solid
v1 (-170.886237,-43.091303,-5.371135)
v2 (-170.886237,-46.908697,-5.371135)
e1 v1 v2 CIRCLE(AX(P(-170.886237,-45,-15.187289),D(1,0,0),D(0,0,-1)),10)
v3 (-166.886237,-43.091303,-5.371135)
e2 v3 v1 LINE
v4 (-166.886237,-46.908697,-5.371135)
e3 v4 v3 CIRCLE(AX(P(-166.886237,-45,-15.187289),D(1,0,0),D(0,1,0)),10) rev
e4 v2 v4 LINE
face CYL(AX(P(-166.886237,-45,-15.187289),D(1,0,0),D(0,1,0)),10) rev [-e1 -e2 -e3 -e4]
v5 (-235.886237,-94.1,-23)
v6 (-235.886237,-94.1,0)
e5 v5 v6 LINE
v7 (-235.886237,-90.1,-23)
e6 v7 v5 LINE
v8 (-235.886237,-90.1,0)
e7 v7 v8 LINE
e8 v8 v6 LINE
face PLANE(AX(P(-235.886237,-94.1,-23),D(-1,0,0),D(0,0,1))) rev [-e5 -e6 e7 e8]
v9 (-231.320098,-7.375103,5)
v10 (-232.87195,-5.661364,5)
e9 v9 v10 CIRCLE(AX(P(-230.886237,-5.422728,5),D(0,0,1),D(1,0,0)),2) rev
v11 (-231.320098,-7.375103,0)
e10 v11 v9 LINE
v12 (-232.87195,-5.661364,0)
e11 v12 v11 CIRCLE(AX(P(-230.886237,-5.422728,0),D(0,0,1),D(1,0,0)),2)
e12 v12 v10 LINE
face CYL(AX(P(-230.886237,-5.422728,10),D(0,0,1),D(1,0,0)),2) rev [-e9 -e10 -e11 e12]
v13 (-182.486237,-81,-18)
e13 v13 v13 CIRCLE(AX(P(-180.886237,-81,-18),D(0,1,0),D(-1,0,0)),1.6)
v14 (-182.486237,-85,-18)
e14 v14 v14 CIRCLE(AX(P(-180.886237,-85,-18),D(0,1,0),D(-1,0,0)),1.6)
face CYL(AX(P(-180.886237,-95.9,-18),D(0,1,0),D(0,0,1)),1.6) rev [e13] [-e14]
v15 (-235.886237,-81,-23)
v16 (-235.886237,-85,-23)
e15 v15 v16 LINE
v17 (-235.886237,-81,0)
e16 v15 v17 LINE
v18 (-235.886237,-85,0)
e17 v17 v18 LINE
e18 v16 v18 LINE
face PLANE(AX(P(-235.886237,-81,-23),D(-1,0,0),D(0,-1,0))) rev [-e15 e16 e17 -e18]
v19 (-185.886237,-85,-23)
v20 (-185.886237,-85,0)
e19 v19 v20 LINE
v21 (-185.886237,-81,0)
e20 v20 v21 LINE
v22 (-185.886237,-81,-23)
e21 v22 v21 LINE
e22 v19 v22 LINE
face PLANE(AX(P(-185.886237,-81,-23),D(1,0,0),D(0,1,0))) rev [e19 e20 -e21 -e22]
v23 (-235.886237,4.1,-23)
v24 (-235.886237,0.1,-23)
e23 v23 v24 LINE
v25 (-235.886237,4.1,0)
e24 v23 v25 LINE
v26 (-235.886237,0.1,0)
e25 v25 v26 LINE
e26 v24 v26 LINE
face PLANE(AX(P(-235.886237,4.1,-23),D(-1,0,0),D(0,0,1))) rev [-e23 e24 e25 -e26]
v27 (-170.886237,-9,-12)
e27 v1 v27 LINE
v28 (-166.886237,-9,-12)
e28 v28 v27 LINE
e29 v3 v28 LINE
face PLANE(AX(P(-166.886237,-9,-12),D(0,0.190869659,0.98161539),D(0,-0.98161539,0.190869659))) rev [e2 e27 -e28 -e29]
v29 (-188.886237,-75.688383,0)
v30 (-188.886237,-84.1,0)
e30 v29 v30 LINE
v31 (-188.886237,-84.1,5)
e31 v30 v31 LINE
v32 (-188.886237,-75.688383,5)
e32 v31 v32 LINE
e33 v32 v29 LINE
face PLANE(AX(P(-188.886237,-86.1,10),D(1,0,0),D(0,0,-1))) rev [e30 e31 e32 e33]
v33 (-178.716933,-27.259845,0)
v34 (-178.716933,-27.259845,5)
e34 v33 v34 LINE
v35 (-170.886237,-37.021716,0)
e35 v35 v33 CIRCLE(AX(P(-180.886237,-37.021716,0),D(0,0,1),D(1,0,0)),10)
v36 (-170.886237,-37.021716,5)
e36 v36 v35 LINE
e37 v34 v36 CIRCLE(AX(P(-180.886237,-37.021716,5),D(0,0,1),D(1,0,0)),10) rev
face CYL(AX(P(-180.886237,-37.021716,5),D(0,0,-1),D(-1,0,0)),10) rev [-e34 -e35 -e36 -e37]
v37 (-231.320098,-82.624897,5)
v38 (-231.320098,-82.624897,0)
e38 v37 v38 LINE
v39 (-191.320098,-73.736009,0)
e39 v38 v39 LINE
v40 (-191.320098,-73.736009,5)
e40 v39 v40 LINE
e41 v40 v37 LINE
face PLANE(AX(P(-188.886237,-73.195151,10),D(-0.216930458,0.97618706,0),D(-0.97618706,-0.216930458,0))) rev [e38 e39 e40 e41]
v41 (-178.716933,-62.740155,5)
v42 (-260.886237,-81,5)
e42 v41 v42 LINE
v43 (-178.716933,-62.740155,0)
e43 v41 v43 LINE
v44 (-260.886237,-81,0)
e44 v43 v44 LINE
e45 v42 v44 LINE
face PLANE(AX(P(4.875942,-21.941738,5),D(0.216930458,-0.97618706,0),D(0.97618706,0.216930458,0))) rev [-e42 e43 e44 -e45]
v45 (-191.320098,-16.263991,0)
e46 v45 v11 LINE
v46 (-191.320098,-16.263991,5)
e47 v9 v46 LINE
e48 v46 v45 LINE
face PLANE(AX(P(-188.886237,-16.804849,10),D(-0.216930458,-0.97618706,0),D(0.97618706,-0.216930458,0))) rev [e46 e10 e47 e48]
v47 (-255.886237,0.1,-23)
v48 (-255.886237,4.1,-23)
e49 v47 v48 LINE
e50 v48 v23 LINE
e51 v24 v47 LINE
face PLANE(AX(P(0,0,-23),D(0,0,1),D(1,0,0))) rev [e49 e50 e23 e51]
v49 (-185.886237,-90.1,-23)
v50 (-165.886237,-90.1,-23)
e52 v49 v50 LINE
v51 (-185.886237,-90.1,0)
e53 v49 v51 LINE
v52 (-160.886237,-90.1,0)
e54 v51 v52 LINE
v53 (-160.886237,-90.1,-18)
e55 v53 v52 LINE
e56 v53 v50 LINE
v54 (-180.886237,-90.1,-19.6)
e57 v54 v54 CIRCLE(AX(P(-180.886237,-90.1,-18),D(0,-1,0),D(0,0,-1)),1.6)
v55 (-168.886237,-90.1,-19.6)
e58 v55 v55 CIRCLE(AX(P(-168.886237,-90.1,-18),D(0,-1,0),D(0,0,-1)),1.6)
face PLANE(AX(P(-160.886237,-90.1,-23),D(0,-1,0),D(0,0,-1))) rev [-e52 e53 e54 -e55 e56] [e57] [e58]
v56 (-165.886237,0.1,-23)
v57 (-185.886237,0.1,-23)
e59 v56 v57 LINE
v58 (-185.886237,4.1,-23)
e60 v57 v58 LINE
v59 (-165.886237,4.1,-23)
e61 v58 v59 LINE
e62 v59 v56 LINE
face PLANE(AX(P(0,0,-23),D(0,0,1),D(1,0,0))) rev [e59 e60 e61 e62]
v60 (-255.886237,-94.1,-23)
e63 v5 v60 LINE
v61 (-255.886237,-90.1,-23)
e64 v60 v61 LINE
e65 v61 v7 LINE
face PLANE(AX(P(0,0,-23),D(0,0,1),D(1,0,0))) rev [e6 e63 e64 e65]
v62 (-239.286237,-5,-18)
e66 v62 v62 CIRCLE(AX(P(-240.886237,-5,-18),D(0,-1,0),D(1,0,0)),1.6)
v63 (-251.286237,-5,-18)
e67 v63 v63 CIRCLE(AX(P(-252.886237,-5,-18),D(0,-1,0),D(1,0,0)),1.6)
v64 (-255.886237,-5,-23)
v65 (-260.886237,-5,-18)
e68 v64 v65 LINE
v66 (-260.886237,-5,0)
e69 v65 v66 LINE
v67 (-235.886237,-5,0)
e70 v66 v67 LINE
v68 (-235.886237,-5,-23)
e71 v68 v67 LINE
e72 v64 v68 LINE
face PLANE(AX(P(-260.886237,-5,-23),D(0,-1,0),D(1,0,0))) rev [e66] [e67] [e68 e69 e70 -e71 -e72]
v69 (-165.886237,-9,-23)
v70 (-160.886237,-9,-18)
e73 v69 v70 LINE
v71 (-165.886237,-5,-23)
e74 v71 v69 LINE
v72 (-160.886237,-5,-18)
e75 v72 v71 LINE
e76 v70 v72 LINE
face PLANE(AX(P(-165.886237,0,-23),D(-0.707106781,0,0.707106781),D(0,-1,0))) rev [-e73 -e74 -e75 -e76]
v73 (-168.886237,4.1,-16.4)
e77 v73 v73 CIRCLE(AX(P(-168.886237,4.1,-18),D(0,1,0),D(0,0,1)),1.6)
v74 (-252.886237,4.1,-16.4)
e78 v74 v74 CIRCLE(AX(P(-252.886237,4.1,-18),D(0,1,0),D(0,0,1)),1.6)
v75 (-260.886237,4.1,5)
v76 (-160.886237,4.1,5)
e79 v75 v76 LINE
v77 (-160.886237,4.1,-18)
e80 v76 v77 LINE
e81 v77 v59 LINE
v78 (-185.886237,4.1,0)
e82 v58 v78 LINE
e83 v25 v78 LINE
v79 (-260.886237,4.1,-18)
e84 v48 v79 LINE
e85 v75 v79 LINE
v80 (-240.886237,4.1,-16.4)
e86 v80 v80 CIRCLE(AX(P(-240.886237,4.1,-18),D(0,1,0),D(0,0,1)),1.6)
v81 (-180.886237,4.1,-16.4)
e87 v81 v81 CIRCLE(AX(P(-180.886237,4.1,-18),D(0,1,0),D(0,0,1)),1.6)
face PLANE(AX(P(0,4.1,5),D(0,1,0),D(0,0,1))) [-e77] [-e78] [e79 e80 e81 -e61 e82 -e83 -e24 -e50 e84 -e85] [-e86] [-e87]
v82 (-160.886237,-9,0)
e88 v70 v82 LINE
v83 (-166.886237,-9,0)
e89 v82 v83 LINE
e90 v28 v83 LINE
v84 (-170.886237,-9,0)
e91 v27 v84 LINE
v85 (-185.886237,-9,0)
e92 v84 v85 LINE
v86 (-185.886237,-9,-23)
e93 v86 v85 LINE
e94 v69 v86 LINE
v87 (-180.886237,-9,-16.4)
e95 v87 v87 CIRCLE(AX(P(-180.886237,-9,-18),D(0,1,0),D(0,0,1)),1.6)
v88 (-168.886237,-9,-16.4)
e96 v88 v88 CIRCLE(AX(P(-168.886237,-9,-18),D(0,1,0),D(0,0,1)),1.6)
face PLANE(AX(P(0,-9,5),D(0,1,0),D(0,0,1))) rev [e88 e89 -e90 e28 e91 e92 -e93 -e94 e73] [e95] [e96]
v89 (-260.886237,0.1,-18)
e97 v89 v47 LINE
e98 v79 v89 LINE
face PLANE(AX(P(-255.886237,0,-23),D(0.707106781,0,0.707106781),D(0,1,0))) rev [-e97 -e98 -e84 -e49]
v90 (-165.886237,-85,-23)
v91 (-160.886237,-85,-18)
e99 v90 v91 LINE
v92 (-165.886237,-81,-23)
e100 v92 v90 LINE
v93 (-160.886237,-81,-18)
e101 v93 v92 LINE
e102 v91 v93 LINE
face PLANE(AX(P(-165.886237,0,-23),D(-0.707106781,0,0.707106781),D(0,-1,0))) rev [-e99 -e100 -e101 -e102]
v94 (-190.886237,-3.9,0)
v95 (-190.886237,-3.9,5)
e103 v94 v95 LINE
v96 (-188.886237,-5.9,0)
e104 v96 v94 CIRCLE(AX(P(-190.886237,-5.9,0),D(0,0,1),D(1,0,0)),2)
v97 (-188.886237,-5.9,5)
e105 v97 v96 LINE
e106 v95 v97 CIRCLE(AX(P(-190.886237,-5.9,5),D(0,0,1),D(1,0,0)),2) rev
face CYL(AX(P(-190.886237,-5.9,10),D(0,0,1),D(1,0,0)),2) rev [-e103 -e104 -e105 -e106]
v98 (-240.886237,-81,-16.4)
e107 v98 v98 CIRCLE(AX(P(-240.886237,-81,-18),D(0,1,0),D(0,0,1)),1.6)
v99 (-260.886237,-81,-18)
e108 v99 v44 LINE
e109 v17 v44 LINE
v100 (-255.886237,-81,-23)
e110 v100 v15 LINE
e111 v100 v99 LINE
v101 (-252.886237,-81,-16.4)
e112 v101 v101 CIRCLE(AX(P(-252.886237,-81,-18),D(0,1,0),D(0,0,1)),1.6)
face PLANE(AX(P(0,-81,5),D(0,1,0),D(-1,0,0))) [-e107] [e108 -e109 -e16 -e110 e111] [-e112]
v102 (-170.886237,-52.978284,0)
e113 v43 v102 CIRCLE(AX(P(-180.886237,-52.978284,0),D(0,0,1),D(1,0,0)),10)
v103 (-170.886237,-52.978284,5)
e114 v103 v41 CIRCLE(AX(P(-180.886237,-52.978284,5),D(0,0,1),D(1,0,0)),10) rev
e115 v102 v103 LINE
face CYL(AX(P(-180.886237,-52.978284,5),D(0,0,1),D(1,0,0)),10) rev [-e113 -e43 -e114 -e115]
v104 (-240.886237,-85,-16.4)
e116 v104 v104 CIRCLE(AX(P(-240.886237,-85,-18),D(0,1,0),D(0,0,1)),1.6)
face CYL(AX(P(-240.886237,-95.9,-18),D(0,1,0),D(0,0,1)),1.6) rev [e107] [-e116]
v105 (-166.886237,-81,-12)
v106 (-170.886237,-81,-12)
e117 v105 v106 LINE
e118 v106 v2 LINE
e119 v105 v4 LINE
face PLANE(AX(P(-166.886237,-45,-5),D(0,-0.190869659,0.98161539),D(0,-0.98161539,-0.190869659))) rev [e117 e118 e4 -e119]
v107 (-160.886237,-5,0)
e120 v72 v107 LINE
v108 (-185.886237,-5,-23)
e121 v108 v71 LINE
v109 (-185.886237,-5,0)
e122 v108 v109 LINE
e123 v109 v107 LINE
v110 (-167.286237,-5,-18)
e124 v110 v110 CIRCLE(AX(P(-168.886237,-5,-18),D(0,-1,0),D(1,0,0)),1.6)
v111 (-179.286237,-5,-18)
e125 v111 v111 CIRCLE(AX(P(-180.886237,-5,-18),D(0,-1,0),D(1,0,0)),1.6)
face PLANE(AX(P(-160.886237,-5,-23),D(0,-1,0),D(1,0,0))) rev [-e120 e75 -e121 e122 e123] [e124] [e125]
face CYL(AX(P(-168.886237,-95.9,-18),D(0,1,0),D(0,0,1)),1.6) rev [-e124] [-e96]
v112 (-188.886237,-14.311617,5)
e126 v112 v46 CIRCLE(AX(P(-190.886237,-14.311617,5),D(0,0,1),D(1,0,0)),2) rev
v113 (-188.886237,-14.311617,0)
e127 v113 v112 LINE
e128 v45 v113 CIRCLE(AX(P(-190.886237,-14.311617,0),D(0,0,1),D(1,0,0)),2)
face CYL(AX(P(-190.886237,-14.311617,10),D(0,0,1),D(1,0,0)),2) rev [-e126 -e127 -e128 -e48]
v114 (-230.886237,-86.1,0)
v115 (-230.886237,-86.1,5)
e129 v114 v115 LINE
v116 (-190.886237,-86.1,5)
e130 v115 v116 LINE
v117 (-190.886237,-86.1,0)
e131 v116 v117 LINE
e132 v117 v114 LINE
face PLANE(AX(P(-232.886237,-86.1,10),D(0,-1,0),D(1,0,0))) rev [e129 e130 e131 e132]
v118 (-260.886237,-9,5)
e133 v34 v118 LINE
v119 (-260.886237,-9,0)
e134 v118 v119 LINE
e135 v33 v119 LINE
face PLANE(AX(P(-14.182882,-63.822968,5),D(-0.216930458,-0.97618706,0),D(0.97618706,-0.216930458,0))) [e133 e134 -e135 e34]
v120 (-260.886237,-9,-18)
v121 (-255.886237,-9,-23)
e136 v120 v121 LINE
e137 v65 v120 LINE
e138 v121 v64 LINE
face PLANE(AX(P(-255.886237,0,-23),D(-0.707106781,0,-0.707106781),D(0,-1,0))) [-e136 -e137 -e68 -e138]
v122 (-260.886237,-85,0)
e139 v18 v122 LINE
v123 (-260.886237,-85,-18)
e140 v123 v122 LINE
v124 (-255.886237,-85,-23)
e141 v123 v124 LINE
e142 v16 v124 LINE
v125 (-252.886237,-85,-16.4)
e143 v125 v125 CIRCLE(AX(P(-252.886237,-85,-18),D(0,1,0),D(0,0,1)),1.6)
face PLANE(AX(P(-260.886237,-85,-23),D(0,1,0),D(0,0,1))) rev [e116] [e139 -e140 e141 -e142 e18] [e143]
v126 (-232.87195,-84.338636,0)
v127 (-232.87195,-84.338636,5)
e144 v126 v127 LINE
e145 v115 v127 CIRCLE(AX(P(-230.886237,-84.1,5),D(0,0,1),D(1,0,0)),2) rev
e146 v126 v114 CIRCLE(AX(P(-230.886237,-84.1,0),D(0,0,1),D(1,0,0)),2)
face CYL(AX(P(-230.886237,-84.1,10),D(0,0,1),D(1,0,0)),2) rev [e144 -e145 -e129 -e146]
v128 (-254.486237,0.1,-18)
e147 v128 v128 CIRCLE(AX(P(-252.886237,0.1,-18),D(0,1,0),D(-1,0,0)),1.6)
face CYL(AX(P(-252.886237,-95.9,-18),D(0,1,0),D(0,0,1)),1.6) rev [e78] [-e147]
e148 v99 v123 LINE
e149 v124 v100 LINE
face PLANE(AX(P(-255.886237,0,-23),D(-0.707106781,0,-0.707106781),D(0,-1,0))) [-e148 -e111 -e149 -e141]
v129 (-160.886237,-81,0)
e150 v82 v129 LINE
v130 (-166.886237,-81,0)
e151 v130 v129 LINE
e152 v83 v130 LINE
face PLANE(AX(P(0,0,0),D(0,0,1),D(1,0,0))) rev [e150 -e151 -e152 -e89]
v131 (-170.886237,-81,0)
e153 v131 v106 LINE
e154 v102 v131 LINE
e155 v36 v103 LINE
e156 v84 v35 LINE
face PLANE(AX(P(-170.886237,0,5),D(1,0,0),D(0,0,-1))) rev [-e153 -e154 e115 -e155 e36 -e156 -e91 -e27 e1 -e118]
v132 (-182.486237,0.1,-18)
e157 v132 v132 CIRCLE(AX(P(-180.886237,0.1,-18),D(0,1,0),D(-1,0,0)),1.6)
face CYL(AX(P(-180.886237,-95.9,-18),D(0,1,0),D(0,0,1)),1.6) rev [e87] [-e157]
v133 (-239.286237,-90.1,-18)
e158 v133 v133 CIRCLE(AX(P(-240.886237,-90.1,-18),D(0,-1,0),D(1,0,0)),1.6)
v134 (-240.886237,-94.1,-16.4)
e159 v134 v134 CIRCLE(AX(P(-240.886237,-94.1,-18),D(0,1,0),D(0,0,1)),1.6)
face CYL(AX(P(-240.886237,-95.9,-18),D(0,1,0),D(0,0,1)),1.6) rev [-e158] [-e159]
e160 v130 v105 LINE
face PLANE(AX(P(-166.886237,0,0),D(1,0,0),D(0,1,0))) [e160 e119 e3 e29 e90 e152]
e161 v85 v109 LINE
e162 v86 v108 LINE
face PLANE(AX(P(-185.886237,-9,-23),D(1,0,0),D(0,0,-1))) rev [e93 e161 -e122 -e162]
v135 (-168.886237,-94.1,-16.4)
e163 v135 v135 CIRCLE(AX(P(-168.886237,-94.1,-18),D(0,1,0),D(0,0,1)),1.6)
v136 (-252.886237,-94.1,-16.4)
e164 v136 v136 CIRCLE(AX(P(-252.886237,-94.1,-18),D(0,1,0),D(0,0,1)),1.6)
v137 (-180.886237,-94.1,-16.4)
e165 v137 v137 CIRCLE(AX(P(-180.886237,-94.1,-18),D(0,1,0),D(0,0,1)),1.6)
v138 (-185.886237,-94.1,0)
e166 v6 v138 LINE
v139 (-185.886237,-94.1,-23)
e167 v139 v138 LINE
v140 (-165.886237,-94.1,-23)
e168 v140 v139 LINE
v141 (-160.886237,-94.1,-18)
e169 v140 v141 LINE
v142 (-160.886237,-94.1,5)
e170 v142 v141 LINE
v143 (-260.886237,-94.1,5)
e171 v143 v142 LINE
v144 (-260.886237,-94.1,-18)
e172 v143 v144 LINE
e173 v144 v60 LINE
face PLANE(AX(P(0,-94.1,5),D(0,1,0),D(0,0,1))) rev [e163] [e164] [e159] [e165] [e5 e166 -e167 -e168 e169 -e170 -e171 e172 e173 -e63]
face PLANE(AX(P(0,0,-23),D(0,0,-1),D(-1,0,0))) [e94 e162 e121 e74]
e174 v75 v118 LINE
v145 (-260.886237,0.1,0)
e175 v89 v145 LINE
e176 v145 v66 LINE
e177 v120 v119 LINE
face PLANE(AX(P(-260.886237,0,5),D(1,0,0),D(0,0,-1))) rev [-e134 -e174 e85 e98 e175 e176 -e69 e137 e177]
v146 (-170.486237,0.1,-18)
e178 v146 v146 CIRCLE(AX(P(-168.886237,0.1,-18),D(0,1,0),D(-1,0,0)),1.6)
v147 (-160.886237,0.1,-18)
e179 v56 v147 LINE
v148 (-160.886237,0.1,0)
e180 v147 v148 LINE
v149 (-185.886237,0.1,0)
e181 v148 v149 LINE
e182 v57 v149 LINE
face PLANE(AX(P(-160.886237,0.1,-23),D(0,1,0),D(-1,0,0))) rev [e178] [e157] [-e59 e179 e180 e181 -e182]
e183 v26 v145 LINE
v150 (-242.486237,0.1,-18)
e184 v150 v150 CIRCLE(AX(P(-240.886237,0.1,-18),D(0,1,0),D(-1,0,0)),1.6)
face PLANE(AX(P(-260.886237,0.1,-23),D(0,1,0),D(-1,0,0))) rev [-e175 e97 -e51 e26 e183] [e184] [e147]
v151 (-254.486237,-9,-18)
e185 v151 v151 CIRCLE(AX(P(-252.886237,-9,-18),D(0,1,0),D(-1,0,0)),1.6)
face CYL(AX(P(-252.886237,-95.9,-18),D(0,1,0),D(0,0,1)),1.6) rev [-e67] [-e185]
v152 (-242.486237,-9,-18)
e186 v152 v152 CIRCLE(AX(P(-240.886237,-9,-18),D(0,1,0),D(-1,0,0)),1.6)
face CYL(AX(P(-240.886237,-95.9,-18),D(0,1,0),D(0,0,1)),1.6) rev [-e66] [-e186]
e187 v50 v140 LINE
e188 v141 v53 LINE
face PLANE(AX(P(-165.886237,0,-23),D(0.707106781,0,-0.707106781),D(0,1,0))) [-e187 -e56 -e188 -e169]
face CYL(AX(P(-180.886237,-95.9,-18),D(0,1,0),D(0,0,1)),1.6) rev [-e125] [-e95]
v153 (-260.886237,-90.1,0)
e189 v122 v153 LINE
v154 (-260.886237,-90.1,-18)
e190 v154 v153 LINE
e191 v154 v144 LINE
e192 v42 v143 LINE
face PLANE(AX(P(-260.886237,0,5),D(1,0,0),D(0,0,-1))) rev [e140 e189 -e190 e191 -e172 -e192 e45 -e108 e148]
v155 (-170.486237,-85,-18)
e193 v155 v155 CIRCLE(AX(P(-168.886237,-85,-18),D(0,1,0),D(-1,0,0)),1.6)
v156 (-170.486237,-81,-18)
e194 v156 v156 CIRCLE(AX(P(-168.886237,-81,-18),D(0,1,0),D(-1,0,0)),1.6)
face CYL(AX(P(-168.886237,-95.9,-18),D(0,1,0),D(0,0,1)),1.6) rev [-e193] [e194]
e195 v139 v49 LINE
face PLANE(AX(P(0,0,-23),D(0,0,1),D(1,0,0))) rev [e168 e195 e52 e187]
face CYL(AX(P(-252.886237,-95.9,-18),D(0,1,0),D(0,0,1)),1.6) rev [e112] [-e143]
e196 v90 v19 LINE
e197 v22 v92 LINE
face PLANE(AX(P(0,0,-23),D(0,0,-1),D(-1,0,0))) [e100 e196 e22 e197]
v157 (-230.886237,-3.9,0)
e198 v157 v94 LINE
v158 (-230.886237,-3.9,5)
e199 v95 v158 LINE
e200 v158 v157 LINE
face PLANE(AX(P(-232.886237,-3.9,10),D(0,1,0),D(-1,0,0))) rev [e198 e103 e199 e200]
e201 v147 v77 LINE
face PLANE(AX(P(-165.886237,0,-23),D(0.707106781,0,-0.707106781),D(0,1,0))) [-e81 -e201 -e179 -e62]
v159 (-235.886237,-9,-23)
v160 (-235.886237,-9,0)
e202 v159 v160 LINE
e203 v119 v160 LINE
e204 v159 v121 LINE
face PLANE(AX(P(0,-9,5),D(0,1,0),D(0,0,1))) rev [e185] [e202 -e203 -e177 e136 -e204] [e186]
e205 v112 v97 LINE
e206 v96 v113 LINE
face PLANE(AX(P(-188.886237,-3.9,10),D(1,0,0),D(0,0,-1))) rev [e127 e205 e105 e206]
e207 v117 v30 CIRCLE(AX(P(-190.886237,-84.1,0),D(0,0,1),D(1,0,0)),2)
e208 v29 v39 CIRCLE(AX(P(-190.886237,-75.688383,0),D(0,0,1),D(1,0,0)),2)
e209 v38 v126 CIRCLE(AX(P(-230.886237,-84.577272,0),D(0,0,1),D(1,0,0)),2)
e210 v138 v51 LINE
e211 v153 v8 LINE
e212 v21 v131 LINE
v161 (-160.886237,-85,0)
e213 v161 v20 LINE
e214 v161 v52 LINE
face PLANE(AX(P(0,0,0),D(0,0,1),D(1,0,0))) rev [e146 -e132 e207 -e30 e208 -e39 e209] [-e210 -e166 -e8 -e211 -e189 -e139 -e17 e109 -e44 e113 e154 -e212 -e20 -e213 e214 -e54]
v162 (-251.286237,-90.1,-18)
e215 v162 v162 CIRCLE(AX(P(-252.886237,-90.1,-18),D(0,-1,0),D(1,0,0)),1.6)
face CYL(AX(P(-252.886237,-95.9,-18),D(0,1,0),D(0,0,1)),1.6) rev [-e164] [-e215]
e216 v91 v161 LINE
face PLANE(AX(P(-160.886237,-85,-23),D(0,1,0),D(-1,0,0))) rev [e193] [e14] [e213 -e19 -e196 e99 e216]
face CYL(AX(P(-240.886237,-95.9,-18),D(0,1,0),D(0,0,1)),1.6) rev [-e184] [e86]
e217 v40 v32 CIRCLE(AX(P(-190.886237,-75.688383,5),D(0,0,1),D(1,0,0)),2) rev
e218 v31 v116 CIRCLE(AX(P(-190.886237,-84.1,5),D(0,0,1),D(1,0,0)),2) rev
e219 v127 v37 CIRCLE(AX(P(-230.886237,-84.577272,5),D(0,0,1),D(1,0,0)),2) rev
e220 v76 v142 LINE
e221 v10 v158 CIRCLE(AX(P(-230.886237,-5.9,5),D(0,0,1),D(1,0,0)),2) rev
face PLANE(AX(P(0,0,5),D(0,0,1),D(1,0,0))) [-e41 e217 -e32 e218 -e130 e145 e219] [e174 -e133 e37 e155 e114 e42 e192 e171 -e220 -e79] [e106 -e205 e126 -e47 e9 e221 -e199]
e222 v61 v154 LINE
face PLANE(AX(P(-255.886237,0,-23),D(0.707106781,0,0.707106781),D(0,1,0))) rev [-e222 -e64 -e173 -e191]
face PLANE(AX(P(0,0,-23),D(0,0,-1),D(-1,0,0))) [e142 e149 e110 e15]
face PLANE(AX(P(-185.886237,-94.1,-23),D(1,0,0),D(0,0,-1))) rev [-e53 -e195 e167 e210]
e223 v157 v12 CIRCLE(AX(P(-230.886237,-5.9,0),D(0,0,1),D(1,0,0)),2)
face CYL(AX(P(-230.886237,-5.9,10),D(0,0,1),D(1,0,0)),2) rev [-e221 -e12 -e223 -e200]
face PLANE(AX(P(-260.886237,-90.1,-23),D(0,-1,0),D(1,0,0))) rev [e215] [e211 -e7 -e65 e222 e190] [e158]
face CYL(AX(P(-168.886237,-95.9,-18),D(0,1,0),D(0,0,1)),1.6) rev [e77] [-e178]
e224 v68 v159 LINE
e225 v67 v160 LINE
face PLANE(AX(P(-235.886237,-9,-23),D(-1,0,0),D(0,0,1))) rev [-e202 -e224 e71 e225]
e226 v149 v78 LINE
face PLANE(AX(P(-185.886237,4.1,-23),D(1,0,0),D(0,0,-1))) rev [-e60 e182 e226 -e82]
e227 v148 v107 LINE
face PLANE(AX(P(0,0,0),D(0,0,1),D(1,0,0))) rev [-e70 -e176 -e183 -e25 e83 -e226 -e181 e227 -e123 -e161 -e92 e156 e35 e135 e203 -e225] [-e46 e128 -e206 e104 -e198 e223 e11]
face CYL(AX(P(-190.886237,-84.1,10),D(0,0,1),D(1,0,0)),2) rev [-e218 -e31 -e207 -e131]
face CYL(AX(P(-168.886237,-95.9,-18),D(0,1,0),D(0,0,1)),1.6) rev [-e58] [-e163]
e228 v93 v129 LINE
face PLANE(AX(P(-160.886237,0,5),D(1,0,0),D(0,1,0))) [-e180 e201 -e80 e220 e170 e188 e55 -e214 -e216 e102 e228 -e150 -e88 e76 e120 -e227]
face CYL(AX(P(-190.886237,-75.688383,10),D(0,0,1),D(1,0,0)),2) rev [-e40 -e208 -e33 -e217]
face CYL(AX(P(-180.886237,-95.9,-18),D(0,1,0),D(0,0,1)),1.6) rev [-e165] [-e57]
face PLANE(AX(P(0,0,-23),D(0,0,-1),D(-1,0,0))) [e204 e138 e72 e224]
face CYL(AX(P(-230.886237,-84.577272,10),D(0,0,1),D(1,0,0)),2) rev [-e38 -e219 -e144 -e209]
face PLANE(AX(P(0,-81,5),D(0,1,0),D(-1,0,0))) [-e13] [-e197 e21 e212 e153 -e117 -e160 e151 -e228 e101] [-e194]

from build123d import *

# Parameters (mm, degrees)
SKETCH_1_W          = 100
SKETCH_1_H          = 98.2
EXTRUDE_1_DEPTH     = 5
SKETCH_2_W          = 25
SKETCH_2_H          = 4
EXTRUDE_2_DEPTH     = 23
CHAMFER_1_SIZE      = 5
SKETCH_3_R          = 1.6
CUT_EXTRUDE_1_DEPTH = 100
SKETCH_5_W          = 90
SKETCH_5_H          = 72
CUT_EXTRUDE_2_DEPTH = 10
EXTRUDE_3_DEPTH     = 5
FILLET_1_R          = 10
EXTRUDE_4_DEPTH     = 4
CUT_EXTRUDE_3_DEPTH = 10
FILLET1_R           = 10
FILLET2_R           = 2


with BuildPart() as part:
    # 草图1 → 凸台-拉伸1 (new body)
    with BuildSketch(Plane.XY):
        with Locations((-210.886237356, -45)):
            Rectangle(SKETCH_1_W, SKETCH_1_H)
        with BuildLine():
            ThreePointArc((-245.131057565, -22.358440495), (-248.492232664, -20.607289414), (-250.886237356, -23.545446947))
            Line((-250.886237356, -23.545446947), (-250.886237356, -78))
            ThreePointArc((-250.886237356, -78), (-250.0075577, -80.121320344), (-247.886237356, -81))
            Line((-247.886237356, -81), (-224.42573361, -81))
            ThreePointArc((-224.42573361, -81), (-221.919639103, -79.649087724), (-221.670553819, -76.812993548))
            Line((-221.670553819, -76.812993548), (-245.131057565, -22.358440495))
        make_face(mode=Mode.SUBTRACT)
        with BuildLine():
            ThreePointArc((-191.655684006, -33.128922342), (-194.657829236, -31.333405344), (-197.320051564, -33.602618764))
            Line((-197.320051564, -33.602618764), (-208.123721184, -77.279649032))
            ThreePointArc((-208.123721184, -77.279649032), (-207.573803103, -79.849181859), (-205.211489311, -81))
            Line((-205.211489311, -81), (-175.458011282, -81))
            ThreePointArc((-175.458011282, -81), (-172.949810516, -79.645882413), (-172.705875596, -76.805952611))
            Line((-172.705875596, -76.805952611), (-191.655684006, -33.128922342))
        make_face(mode=Mode.SUBTRACT)
        with BuildLine():
            ThreePointArc((-176.638373042, -42.617387799), (-173.276486201, -44.360720795), (-170.886237356, -41.42334041))
            Line((-170.886237356, -41.42334041), (-170.886237356, -12))
            ThreePointArc((-170.886237356, -12), (-171.764917013, -9.878679656), (-173.886237356, -9))
            Line((-173.886237356, -9), (-186.651909841, -9))
            ThreePointArc((-186.651909841, -9), (-189.160110607, -10.354117587), (-189.404045527, -13.194047389))
            Line((-189.404045527, -13.194047389), (-176.638373042, -42.617387799))
        make_face(mode=Mode.SUBTRACT)
        with BuildLine():
            Line((-203.040454286, -12.717792993), (-213.768880163, -56.2546336))
            ThreePointArc((-213.768880163, -56.2546336), (-216.43424337, -58.526613784), (-219.43692336, -56.723847059))
            Line((-219.43692336, -56.723847059), (-238.193779397, -13.187006452))
            ThreePointArc((-238.193779397, -13.187006452), (-237.944694112, -10.350912276), (-235.438599605, -9))
            Line((-235.438599605, -9), (-205.953317692, -9))
            ThreePointArc((-205.953317692, -9), (-203.591816159, -10.149780956), (-203.040454286, -12.717792993))
        make_face(mode=Mode.SUBTRACT)
    extrude(amount=EXTRUDE_1_DEPTH)

    # 草图2 → 凸台-拉伸2 (add)
    with BuildSketch(Plane(origin=(0, 0, 0), x_dir=(-1, 0, 0), z_dir=(0, 0, -1))):
        with Locations((248.386237356, 2.1)):
            Rectangle(SKETCH_2_W, SKETCH_2_H)
        with Locations((248.386237356, -7)):
            Rectangle(SKETCH_2_W, SKETCH_2_H)
        with Locations((173.386237356, -7)):
            Rectangle(SKETCH_2_W, SKETCH_2_H)
        with Locations((173.386237356, 2.1)):
            Rectangle(SKETCH_2_W, SKETCH_2_H)
        with Locations((173.386237356, -92.1)):
            Rectangle(SKETCH_2_W, SKETCH_2_H)
        with Locations((173.386237356, -83)):
            Rectangle(SKETCH_2_W, SKETCH_2_H)
        with Locations((248.386237356, -83)):
            Rectangle(SKETCH_2_W, SKETCH_2_H)
        with Locations((248.386237356, -92.1)):
            Rectangle(SKETCH_2_W, SKETCH_2_H)
    extrude(amount=EXTRUDE_2_DEPTH)

    # 倒角1
    chamfer_1_edges = [part.edges().sort_by_distance(p)[0] for p in [
        (-160.886237356, -7, -23),
        (-160.886237356, 2.1, -23),
        (-160.886237356, -92.1, -23),
        (-160.886237356, -83, -23),
        (-260.886237356, -83, -23),
        (-260.886237356, -92.1, -23),
        (-260.886237356, 2.1, -23),
        (-260.886237356, -7, -23),
    ]]
    chamfer(chamfer_1_edges, length=CHAMFER_1_SIZE)

    # 草图3 → 切除-拉伸1 (cut)
    with BuildSketch(Plane(origin=(0, 4.1, 0), x_dir=(1, 0, 0), z_dir=(0, 1, 0))):
        with Locations(Location((-252.886237356, 18, 0), (0, 0, 270))):
            Circle(SKETCH_3_R)
        with Locations(Location((-240.886237356, 18, 0), (0, 0, 270))):
            Circle(SKETCH_3_R)
        with Locations(Location((-180.886237356, 18, 0), (0, 0, 180))):
            Circle(SKETCH_3_R)
        with Locations(Location((-168.886237356, 18, 0), (0, 0, 180))):
            Circle(SKETCH_3_R)
    extrude(amount=-CUT_EXTRUDE_1_DEPTH, mode=Mode.SUBTRACT)

    # 草图5 → 切除-拉伸2 (cut)
    with BuildSketch(Plane(origin=(0, 0, 0), x_dir=(-1, 0, 0), z_dir=(0, 0, -1))):
        with Locations((215.886237356, -45)):
            Rectangle(SKETCH_5_W, SKETCH_5_H)
    extrude(amount=-CUT_EXTRUDE_2_DEPTH, mode=Mode.SUBTRACT)

    # 草图6 → 凸台-拉伸3 (add)
    with BuildSketch(Plane(origin=(0, 0, 0), x_dir=(-1, 0, 0), z_dir=(0, 0, -1))):
        Polygon((170.886237356, -29), (260.886237356, -9), (170.886237356, -9), align=None)
        Polygon((170.886237356, -61), (170.886237356, -81), (260.886237356, -81), align=None)
    extrude(amount=-EXTRUDE_3_DEPTH)

    # 圆角1
    fillet_1_edges = [part.edges().sort_by_distance(p)[0] for p in [
        (-170.886237356, -29, 2.5),
        (-170.886237356, -61, 2.5),
    ]]
    fillet(fillet_1_edges, radius=FILLET_1_R)

    # 草图7 → 凸台-拉伸4 (add)
    with BuildSketch(Plane(origin=(-170.886237356, 0, 0), x_dir=(0, 0, -1), z_dir=(1, 0, 0))):
        Polygon((12, -9), (5, -45), (12, -81), (0, -81), (0, -9), align=None)
    extrude(amount=EXTRUDE_4_DEPTH)

    # 草图8 → 切除-拉伸3 (cut)
    with BuildSketch(Plane(origin=(0, 0, 0), x_dir=(-1, 0, 0), z_dir=(0, 0, -1))):
        Polygon((188.886237356, -16.804849371), (232.886237356, -7.027071594), (232.886237356, -3.9), (188.886237356, -3.9), align=None)
        Polygon((188.886237356, -86.1), (188.886237356, -73.195150629), (232.886237356, -82.972928406), (232.886237356, -86.1), align=None)
    extrude(amount=-CUT_EXTRUDE_3_DEPTH, mode=Mode.SUBTRACT)

    # Fillet1
    fillet1_edges = [part.edges().sort_by_distance(p)[0] for p in [
        (-168.886237356, -45, -5),
    ]]
    fillet(fillet1_edges, radius=FILLET1_R)

    # Fillet2
    # the kernel refuses this fillet: 2 mm, written as the material it adds along each edge
    with BuildSketch(Plane(origin=(-188.886237356, -16.804849371, 0), x_dir=(-0.9761870601839525, 0.2169304578186577, 0), z_dir=(0, 0, 1))) as fillet2_piece_1:
        with BuildLine():
            CenterArc((FILLET2_R * 1.24661605081, -FILLET2_R), FILLET2_R, 90, 102.528807709)
            Line((FILLET2_R * 0.270428990626, -FILLET2_R * 1.21693045782), (0, 0))
            Line((0, 0), (FILLET2_R * 1.24661605081, 0))
        make_face()
    extrude(amount=5)
    with BuildSketch(Plane(origin=(-232.886237356, -7.027071594, 0), x_dir=(0.9761870601839526, -0.21693045781865725, 0), z_dir=(0, 0, 1)), Plane(origin=(-232.886237356, -82.972928406, 0), x_dir=(0, -1, 0), z_dir=(0, 0, 1))) as fillet2_piece_2:
        with BuildLine():
            CenterArc((FILLET2_R * 0.802171606366, FILLET2_R), FILLET2_R, 192.528807709, 77.471192291)
            Line((-FILLET2_R * 0.174015453818, FILLET2_R * 0.783069542181), (0, 0))
            Line((0, 0), (FILLET2_R * 0.802171606366, 0))
        make_face()
    extrude(amount=5)
    with BuildSketch(Plane(origin=(-232.886237356, -3.9, 0), x_dir=(0, -1, 0), z_dir=(0, 0, 1)), Plane(origin=(-188.886237356, -3.9, 0), x_dir=(-1, 0, 0), z_dir=(0, 0, 1)), Plane(origin=(-232.886237356, -86.1, 0), x_dir=(1, 0, 0), z_dir=(0, 0, 1))) as fillet2_piece_3:
        with BuildLine():
            CenterArc((FILLET2_R, FILLET2_R), FILLET2_R, 180, 90)
            Line((0, FILLET2_R), (0, 0))
            Line((0, 0), (FILLET2_R, 0))
        make_face()
    extrude(amount=5)
    with BuildSketch(Plane(origin=(-188.886237356, -73.195150629, 0), x_dir=(-0.9761870601839525, -0.21693045781865739, 0), z_dir=(0, 0, 1))) as fillet2_piece_4:
        with BuildLine():
            CenterArc((FILLET2_R * 1.24661605081, FILLET2_R), FILLET2_R, 167.471192291, 102.528807709)
            Line((FILLET2_R * 0.270428990626, FILLET2_R * 1.21693045782), (0, 0))
            Line((0, 0), (FILLET2_R * 1.24661605081, 0))
        make_face()
    extrude(amount=5)
    with BuildSketch(Plane(origin=(-188.886237356, -86.1, 0), x_dir=(-1, 0, 0), z_dir=(0, 0, 1))) as fillet2_piece_5:
        with BuildLine():
            CenterArc((FILLET2_R, -FILLET2_R), FILLET2_R, 90, 90)
            Line((0, -FILLET2_R), (0, 0))
            Line((0, 0), (FILLET2_R, 0))
        make_face()
    extrude(amount=5)


solid = part.part
